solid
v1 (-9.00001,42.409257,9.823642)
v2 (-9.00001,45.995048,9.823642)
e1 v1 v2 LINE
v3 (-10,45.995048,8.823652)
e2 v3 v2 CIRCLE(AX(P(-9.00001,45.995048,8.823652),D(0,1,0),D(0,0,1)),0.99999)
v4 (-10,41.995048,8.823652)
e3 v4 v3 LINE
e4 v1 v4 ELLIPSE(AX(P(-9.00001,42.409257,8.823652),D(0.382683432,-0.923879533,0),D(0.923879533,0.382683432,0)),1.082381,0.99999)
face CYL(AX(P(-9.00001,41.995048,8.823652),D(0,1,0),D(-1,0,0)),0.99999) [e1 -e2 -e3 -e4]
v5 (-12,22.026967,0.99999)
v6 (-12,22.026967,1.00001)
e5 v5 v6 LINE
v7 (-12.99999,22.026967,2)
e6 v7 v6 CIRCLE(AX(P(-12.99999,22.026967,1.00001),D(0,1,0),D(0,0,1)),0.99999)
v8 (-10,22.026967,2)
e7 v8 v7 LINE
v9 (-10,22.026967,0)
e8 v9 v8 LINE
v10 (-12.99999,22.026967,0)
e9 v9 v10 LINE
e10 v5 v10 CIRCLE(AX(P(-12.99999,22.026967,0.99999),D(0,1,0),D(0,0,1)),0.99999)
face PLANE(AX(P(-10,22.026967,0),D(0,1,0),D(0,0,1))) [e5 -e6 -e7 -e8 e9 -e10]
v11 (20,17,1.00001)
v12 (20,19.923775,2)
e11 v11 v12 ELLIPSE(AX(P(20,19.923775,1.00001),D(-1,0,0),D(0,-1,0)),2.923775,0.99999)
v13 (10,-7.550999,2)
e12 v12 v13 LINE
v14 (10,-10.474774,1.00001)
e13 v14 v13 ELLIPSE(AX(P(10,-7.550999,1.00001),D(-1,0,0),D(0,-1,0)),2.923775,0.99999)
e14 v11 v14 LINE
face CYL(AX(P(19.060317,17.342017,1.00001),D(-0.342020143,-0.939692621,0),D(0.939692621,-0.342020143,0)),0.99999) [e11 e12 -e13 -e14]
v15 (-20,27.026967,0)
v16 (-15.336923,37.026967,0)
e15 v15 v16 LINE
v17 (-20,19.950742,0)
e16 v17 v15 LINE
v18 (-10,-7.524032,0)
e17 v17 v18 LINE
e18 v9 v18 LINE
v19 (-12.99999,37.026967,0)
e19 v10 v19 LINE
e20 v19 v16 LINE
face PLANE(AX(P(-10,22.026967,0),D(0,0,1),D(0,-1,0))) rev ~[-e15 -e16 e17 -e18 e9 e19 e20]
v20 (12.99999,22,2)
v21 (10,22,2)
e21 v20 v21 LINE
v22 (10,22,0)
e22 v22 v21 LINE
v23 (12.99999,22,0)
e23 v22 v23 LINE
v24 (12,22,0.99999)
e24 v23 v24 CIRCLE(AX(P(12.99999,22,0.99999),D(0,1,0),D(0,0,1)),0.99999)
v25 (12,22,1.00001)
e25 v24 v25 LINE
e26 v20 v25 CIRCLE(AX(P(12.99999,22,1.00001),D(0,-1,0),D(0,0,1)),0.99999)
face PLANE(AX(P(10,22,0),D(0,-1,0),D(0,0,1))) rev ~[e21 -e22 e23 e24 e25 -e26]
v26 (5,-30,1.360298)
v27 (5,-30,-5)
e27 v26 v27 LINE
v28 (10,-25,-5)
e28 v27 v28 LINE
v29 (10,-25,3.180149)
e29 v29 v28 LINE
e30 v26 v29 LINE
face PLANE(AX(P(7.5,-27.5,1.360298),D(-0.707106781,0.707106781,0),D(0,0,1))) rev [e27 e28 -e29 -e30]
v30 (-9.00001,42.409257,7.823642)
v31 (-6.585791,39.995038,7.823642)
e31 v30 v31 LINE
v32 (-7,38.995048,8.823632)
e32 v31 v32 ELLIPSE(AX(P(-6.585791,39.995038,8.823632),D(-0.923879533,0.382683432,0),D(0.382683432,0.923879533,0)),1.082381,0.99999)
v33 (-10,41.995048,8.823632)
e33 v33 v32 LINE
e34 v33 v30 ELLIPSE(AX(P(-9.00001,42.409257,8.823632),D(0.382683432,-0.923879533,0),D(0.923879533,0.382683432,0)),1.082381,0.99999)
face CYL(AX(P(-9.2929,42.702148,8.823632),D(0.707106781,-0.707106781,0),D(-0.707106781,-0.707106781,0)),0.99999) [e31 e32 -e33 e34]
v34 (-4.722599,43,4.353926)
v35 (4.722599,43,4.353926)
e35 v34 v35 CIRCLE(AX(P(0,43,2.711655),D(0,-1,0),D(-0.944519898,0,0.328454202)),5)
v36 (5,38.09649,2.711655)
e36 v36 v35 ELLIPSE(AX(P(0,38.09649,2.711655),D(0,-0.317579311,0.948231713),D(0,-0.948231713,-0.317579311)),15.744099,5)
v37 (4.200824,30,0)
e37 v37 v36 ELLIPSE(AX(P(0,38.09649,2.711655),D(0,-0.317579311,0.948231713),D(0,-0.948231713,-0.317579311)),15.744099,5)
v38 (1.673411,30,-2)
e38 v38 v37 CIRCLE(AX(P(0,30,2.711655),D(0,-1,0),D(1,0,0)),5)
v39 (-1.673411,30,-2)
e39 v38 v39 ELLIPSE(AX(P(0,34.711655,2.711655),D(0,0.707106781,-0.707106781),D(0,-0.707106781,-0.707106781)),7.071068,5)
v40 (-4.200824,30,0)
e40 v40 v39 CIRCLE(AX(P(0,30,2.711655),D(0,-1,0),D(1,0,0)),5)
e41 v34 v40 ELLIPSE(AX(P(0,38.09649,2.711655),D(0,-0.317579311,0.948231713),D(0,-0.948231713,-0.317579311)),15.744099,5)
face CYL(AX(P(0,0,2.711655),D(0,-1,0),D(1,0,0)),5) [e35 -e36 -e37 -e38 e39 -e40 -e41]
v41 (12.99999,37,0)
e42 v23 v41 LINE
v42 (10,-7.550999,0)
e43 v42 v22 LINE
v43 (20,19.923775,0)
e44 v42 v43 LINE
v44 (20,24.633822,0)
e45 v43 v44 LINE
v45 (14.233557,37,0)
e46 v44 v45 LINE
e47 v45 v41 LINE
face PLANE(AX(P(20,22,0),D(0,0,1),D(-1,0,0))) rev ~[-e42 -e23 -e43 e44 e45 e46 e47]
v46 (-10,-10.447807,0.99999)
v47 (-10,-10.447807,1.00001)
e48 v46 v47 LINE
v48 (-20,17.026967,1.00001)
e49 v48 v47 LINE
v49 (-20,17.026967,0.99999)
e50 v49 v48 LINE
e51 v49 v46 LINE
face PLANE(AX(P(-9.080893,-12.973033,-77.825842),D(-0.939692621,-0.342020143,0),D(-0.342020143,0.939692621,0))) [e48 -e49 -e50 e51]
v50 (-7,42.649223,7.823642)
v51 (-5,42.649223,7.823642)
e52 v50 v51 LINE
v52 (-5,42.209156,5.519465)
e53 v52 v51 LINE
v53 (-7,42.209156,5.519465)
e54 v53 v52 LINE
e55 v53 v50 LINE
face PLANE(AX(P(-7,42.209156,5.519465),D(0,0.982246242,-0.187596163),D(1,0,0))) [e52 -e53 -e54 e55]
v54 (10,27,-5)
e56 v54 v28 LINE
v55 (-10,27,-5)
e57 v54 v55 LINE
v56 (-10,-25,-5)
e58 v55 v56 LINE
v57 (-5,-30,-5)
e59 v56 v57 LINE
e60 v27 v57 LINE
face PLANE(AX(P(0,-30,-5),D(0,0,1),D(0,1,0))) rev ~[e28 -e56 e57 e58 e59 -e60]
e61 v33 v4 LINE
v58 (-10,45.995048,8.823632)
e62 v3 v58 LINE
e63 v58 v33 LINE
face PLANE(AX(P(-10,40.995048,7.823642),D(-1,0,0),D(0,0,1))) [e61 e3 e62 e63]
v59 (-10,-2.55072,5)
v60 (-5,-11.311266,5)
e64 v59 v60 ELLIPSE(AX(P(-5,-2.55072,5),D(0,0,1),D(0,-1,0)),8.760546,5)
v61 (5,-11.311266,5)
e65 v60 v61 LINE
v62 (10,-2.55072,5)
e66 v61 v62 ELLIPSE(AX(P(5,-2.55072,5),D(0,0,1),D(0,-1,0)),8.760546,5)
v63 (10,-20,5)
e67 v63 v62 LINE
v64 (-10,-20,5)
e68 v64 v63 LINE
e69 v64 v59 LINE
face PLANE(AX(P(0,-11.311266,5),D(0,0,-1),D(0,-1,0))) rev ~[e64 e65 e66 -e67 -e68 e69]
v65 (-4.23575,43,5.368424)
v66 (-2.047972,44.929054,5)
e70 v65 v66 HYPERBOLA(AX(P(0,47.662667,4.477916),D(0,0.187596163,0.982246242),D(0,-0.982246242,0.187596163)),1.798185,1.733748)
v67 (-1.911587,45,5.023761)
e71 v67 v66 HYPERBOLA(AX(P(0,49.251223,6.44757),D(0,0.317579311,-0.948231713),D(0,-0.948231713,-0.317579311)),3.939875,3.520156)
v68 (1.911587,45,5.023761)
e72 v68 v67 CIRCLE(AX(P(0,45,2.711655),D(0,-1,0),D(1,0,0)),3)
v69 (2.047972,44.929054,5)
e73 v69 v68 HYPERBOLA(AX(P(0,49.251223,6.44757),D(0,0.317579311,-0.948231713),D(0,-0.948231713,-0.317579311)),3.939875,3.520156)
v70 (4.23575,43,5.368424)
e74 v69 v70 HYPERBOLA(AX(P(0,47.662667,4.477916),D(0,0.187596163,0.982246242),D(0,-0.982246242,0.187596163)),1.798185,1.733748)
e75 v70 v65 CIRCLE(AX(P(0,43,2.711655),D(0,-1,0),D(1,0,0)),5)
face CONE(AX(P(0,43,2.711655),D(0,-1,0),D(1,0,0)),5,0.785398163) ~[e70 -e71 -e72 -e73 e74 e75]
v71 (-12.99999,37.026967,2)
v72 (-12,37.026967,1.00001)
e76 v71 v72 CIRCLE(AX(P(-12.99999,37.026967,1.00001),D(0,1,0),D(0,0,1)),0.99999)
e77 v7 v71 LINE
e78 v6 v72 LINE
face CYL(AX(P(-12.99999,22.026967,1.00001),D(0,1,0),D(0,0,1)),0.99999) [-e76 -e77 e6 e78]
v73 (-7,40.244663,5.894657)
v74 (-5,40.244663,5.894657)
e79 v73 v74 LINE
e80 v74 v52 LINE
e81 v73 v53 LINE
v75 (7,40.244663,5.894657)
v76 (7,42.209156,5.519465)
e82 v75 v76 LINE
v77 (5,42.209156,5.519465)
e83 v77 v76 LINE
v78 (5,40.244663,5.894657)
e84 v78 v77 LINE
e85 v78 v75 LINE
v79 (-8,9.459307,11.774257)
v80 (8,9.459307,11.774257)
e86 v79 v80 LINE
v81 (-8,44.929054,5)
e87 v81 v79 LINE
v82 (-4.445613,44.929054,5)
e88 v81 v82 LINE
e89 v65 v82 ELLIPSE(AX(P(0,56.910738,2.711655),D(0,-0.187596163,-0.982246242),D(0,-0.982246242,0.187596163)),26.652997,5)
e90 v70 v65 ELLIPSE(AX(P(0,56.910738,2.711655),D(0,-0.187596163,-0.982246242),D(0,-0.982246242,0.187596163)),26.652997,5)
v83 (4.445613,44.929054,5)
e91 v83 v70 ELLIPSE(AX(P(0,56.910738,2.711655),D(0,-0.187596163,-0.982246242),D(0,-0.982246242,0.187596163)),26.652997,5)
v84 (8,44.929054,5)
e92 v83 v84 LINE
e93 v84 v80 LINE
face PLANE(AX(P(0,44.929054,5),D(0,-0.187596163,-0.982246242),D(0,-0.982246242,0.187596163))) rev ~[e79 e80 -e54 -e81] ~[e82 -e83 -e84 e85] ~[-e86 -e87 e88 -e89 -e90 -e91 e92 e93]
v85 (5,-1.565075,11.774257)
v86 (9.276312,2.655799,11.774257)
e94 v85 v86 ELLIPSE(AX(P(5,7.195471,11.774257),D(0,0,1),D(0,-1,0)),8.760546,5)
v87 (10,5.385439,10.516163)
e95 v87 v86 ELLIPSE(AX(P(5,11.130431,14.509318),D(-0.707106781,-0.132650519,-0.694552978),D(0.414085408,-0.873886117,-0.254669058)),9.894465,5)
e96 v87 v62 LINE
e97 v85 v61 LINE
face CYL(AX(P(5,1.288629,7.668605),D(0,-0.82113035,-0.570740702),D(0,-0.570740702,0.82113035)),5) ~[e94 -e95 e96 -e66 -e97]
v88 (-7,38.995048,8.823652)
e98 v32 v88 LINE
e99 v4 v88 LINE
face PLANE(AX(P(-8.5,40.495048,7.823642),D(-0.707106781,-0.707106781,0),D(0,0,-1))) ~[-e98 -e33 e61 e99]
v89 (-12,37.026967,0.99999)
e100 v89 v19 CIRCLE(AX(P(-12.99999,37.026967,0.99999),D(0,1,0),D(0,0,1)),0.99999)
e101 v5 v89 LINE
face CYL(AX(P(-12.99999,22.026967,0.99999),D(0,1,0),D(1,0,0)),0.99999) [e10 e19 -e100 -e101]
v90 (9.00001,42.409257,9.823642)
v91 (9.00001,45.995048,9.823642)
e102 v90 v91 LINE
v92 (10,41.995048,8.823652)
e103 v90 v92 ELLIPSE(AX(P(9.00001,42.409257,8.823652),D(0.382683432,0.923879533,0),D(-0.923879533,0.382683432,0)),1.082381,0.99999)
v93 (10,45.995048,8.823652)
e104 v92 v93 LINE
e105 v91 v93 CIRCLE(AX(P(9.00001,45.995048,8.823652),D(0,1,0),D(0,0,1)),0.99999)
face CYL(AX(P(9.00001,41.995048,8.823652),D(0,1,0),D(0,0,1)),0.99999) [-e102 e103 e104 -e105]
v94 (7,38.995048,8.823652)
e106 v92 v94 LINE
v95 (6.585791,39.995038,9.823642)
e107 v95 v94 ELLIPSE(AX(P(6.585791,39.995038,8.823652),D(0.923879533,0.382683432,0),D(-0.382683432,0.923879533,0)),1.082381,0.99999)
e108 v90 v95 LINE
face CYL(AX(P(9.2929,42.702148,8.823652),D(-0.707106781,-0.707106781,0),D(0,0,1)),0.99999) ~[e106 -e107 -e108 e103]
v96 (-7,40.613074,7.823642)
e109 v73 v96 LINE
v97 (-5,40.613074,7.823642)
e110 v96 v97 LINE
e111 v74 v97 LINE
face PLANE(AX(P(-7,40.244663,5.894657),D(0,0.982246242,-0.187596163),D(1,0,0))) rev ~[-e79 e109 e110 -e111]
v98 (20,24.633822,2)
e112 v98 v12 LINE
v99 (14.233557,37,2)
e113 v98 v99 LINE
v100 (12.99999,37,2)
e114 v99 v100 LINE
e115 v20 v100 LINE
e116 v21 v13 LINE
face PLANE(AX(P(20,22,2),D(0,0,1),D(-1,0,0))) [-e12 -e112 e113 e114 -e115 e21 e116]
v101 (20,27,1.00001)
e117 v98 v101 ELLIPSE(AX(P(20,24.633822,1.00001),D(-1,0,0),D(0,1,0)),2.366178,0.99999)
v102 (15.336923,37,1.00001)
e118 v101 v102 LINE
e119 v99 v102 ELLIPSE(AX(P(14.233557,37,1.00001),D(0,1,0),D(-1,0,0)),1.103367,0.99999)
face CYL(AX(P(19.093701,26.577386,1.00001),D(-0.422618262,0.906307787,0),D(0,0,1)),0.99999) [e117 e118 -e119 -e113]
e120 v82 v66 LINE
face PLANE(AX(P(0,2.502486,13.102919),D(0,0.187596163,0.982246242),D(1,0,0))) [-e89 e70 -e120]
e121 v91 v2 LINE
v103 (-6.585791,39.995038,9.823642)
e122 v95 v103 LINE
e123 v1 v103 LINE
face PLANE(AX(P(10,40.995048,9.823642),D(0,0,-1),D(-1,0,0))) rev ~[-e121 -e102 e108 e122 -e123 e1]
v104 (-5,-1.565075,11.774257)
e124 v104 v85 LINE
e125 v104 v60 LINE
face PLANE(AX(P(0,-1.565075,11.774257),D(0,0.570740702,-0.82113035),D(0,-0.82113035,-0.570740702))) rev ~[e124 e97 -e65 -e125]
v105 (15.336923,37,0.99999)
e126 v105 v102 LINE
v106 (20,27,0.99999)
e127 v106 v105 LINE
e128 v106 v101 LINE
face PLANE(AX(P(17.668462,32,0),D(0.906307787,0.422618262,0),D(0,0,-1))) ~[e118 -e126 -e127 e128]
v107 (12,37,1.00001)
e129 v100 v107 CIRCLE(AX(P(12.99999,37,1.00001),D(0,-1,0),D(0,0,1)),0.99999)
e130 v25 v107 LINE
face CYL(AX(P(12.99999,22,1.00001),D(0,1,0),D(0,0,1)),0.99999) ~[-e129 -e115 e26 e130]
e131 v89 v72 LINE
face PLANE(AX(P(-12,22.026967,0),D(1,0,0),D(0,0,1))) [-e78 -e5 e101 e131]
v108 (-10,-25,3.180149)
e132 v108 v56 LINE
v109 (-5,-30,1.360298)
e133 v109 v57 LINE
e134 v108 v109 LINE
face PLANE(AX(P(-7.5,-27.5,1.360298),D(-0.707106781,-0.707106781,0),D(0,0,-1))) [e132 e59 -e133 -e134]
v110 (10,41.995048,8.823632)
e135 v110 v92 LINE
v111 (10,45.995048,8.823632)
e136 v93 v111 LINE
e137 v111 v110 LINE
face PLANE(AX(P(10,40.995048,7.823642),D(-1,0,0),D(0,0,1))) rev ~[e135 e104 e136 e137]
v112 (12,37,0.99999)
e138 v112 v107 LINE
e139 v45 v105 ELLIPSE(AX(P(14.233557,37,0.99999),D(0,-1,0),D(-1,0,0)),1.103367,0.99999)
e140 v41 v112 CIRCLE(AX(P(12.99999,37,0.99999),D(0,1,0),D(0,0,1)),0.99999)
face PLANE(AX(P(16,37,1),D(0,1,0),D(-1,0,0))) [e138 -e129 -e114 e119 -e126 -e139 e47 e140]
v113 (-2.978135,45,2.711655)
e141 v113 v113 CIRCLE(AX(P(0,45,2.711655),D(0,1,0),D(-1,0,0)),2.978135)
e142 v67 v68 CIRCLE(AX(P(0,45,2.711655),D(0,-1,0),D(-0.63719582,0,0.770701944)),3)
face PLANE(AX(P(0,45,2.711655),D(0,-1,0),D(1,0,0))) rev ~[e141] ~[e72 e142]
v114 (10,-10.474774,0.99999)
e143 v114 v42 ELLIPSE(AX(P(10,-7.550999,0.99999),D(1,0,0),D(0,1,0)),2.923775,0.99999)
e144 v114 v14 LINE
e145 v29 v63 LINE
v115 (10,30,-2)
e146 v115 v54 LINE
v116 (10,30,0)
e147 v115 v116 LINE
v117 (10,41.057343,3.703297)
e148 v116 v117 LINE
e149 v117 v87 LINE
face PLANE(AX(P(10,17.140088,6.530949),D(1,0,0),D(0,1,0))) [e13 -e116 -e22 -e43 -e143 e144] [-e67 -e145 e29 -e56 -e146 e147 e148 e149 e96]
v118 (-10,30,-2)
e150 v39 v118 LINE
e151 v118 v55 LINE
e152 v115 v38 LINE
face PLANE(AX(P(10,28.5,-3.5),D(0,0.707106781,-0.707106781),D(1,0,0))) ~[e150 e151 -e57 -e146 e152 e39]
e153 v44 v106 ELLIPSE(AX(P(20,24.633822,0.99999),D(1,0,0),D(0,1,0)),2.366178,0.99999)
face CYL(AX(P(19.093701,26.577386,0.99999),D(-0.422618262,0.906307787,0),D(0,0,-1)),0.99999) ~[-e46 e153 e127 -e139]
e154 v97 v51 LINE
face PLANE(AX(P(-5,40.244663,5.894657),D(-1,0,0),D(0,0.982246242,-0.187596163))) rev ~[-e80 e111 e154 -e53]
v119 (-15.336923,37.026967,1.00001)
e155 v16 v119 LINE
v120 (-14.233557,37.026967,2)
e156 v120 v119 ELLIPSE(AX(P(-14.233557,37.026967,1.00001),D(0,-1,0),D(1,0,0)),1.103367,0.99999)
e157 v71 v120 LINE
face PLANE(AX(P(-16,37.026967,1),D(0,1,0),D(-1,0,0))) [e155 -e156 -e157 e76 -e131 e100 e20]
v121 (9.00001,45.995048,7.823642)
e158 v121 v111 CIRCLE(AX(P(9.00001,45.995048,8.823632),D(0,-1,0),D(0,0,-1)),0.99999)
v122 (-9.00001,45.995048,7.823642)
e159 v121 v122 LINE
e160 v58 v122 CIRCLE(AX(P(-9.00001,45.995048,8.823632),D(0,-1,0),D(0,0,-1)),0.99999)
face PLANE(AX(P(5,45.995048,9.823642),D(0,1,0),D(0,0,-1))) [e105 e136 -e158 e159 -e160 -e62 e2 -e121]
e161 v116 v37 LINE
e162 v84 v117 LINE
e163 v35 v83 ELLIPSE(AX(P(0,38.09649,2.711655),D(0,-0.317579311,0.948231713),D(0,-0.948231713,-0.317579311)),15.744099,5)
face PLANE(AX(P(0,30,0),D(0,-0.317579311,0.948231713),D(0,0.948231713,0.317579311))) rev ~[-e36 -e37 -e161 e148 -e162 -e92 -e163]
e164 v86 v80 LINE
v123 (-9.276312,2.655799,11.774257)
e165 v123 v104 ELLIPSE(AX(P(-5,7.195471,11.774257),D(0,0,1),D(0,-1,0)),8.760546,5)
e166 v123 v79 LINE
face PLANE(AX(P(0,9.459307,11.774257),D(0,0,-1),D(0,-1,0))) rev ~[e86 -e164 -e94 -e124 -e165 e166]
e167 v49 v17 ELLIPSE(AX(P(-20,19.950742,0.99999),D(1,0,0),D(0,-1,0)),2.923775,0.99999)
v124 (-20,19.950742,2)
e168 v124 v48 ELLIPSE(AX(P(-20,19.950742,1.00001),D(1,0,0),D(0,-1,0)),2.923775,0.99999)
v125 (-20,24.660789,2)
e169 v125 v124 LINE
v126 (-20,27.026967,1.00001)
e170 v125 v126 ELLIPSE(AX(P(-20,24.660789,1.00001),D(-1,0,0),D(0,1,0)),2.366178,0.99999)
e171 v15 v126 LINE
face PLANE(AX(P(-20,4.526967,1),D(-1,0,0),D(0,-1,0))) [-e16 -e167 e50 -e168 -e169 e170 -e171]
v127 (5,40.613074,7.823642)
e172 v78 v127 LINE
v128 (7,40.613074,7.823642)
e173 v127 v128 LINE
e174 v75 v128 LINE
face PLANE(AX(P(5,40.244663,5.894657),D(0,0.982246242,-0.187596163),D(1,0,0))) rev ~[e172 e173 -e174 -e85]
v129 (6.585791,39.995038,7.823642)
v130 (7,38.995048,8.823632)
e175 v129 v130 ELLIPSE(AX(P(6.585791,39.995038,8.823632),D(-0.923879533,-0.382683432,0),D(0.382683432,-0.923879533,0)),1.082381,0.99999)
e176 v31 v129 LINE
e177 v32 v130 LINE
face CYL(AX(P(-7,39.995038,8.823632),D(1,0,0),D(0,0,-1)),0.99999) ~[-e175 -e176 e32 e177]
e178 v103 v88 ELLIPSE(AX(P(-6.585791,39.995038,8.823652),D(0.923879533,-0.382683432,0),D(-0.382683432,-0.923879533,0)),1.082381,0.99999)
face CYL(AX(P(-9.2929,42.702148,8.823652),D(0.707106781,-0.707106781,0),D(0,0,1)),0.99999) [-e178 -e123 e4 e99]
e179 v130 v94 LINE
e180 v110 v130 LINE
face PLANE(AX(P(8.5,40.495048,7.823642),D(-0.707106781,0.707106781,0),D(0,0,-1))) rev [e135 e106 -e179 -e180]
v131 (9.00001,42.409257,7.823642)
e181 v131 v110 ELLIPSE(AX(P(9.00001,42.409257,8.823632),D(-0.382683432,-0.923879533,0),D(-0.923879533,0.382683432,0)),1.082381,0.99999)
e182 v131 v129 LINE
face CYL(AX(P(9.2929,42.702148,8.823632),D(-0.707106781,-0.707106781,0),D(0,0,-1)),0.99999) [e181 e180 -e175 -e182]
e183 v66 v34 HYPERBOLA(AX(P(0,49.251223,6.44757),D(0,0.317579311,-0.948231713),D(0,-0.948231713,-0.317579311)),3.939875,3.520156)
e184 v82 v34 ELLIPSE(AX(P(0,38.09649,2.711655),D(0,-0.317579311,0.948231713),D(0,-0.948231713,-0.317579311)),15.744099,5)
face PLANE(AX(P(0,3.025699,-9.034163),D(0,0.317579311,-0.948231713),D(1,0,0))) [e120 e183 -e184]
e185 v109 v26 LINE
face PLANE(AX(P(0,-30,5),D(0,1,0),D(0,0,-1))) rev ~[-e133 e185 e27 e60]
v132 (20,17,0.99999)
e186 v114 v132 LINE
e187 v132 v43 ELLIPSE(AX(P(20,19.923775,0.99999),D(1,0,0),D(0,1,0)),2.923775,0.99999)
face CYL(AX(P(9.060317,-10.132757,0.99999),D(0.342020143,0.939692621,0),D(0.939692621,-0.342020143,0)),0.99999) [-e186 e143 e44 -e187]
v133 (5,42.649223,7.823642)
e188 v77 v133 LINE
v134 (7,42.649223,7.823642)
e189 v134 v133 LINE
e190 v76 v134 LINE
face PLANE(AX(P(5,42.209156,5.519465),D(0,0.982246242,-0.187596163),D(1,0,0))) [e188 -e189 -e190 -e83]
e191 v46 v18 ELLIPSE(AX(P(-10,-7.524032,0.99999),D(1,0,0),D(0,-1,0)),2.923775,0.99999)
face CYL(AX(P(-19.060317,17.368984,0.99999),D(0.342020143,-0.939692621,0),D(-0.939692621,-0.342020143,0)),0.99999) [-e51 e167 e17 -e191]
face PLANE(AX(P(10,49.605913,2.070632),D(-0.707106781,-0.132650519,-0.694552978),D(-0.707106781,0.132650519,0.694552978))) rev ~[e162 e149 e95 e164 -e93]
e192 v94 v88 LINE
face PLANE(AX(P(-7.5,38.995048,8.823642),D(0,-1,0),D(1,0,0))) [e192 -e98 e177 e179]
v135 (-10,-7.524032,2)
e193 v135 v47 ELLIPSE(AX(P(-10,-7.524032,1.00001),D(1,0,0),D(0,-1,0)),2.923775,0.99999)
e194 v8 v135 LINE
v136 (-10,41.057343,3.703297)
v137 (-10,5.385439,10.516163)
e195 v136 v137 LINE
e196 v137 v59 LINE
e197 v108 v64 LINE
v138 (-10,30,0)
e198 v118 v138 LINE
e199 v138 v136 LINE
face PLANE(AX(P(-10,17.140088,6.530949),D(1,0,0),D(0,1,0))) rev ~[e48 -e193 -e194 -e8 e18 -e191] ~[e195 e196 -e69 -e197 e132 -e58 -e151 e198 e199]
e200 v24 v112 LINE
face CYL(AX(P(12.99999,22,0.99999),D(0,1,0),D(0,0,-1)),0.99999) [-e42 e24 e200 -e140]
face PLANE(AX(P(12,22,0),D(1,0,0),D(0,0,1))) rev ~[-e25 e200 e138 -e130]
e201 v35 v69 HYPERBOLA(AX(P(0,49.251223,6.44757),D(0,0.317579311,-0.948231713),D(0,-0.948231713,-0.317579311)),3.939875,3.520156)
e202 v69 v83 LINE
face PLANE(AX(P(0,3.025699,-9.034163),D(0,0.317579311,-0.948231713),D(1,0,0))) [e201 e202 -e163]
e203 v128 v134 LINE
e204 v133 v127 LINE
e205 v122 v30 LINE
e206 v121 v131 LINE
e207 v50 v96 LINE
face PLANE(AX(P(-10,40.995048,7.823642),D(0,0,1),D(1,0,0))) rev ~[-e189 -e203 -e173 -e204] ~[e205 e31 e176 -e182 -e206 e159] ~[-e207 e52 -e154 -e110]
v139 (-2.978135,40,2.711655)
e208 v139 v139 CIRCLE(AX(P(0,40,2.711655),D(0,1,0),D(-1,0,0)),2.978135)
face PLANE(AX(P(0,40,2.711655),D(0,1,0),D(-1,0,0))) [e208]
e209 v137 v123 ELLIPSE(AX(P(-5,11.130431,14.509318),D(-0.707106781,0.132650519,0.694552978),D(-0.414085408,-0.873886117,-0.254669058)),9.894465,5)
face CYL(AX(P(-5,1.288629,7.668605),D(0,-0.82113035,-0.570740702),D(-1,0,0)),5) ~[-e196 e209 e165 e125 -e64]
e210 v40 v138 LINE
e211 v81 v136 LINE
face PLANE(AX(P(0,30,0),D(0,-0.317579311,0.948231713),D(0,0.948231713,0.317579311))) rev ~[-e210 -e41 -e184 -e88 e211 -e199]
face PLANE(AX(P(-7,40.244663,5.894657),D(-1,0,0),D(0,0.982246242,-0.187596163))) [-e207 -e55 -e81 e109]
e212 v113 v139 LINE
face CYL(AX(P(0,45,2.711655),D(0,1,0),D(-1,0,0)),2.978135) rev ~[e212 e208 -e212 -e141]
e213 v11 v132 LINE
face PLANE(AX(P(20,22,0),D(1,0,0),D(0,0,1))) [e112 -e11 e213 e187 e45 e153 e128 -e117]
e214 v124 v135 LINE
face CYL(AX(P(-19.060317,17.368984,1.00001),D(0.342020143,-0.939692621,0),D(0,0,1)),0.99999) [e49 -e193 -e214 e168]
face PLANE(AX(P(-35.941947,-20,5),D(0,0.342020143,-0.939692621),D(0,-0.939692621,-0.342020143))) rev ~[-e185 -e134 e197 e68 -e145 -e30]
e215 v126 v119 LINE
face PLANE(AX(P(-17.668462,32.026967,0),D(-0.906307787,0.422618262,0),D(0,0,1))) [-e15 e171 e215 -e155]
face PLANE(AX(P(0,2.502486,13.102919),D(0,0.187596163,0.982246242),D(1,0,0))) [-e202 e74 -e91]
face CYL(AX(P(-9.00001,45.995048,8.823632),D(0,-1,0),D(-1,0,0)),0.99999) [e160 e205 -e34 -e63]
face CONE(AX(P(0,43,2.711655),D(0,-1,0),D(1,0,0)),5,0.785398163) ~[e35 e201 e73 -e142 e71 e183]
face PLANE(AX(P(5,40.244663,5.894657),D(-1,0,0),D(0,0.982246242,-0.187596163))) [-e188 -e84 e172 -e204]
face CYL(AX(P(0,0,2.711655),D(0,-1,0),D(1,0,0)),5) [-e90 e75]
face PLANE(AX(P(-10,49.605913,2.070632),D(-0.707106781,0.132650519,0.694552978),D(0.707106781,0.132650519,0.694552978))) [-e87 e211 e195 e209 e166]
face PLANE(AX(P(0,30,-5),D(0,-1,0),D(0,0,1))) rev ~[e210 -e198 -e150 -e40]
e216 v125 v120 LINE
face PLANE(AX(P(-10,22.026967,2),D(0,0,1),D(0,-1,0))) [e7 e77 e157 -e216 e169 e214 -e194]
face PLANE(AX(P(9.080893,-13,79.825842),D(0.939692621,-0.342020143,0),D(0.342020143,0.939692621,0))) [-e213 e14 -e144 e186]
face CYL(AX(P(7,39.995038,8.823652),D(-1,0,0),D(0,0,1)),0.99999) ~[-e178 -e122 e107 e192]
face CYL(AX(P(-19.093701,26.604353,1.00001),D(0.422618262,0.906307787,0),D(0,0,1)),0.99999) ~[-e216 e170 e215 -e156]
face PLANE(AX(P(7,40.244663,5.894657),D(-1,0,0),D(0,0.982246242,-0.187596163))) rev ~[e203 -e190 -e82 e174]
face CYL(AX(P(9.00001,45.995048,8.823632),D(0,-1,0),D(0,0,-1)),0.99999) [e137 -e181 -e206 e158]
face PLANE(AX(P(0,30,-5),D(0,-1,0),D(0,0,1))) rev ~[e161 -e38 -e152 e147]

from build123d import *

# Parameters (mm, degrees)
F1_DEPTH     = 10
F2_DEPTH     = 10
F3_R         = 5
F4_T1_DEPTH  = 71.883894651
F5_T1_DEPTH  = 56.6843134125
F6_SIZE      = 3
F7_SIZE      = 5
F10_DEPTH    = 10
F9_W         = 35
F9_H         = 2
F11_DEPTH    = 10
F12_T4_DEPTH = 157.651683953
F13_T4_DEPTH = 157.651683953
F14_W        = 8
F14_H        = 2
F15_W        = 8
F15_H        = 2
F16_DEPTH    = 15
F17_SIZE2    = 4.6630765815
F17_SIZE     = 10
F18_SIZE2    = 4.6630765815
F18_SIZE     = 10
F19_R        = 0.99999
F20_R        = 5
F21_DEPTH    = 45
F22_R        = 2.9781353661
F23_DEPTH    = 5
F25_W        = 2
F25_H        = 2
F26_DEPTH    = 4
F28_DEPTH    = 15
F29_DEPTH    = 5
F30_W        = 5
F30_H        = 2
F31_DEPTH    = 2
F32_SIZE     = 3
F33_R        = 0.99999


# Not quite as in the source:
# - a fillet or chamfer that OpenCascade refuses, or shapes differently, is made with other operations: its cross-section is extruded or revolved along the edge and cut away or added
# - a fillet or chamfer is up to 0.001 mm smaller than in the source, because OpenCascade refuses the exact size


with BuildPart() as f1:
    # F0 (on Right) → F1 (new body)
    with BuildSketch(Plane.YZ):
        Polygon((30, 5), (30, 0), (44.9290536344, 5), (9.4593074173, 11.7742568254), (-1.5650746645, 11.7742568254), (-11.31126564, 5), align=None)
        Polygon((30, 0), (0, 0), (-30, 0), (-30, -5), (30, -5), align=None)
        Polygon((-30, 0), (0, 0), (30, 0), (30, 5), (-11.31126564, 5), (-30, 5), align=None)
    extrude(amount=-F1_DEPTH)

    # F2 (add): a face of the model
    f2_faces = [f1.faces().sort_by_distance(p)[0] for p in [
        (0, 4.6213303299, 2.1526362718),
    ]]
    extrude(f2_faces, amount=F2_DEPTH)

    # F3
    f3_edges = [f1.edges().sort_by_distance(p)[0] for p in [
        (-10, -6.43817, 8.387128),
        (10, -6.43817, 8.387128),
    ]]
    fillet(f3_edges, radius=F3_R)

    # F4: chamfer of 10 x 3.6397023427 on 1 edges, made by hand

    # F4_s2 → F4_t1 (cut)
    with BuildSketch(Plane.YZ.offset(-35.9419473255)):
        Polygon((-20, 5), (-30, 1.3602976573), (-30, 5), align=None)
    extrude(amount=F4_T1_DEPTH, mode=Mode.SUBTRACT)

    # F5: chamfer of 2 on 2 edges, made by hand

    # F5_s2 → F5_t1 (cut)
    with BuildSketch(Plane(origin=(0, 47.4786197454, -9.0677943367), x_dir=(1, 0, 0), z_dir=(0, -0.9822462418, 0.1875961634))):
        Polygon((-10, 11.3397492965), (-8, 13.3397492965), (-10, 13.3397492965), align=None)
        Polygon((10, 11.3397492965), (8, 13.3397492965), (10, 13.3397492965), align=None)
    extrude(amount=F5_T1_DEPTH, mode=Mode.SUBTRACT)

    # F6
    f6_edges = [f1.edges().sort_by_distance(p)[0] for p in [
        (0, 30, -5),
    ]]
    chamfer(f6_edges, length=F6_SIZE)

    # F7
    f7_edges = [f1.edges().sort_by_distance(p)[0] for p in [
        (-10, -30, -1.819851),
        (10, -30, -1.819851),
    ]]
    chamfer(f7_edges, length=F7_SIZE)

    # F8 (on face) → F10 (join)
    with BuildSketch(Plane.YZ.offset(10)):
        Polygon((-13, 0), (0, 0), (22, 0), (22, 2), (-13, 2), align=None)
    extrude(amount=F10_DEPTH)

    # F9 (on face) → F11 (join)
    with BuildSketch(Plane(origin=(-10, 0, 0), x_dir=(0, -1, 0), z_dir=(-1, 0, 0))):
        with Locations((-4.5269672573, 1)):
            Rectangle(F9_W, F9_H)
    extrude(amount=F11_DEPTH)

    # F12: chamfer of 30 x 10.919107028 on 1 edges, made by hand


with BuildPart() as f12_tool2:
    # F12_s3 → F12_t4 (new body)
    with BuildSketch(Plane.XY.offset(-77.8258419765)):
        Polygon((-9.080892972, -12.9730327427), (-20, 17.0269672573), (-20, -12.9730327427), align=None)
    extrude(amount=F12_T4_DEPTH)

    split(bisect_by=Plane.YZ.offset(-10), keep=Keep.BOTTOM)


with BuildPart() as f1_1:
    add(f1.part)

    # F12_t1: cut F12_tool2
    add(f12_tool2.part, mode=Mode.SUBTRACT)

    # F13: chamfer of 30 x 10.919107028 on 1 edges, made by hand


with BuildPart() as f13_tool2:
    # F13_s3 → F13_t4 (new body)
    with BuildSketch(Plane.XY.offset(79.8258419765)):
        Polygon((9.080892972, -13), (20, 17), (20, -13), align=None)
    extrude(amount=-F13_T4_DEPTH)

    split(bisect_by=Plane.YZ.offset(10), keep=Keep.TOP)


with BuildPart() as f1_2:
    add(f1_1.part)

    # F13_t1: cut F13_tool2
    add(f13_tool2.part, mode=Mode.SUBTRACT)

    # F14 (on face) + F15 (on face) → F16 (join)
    with BuildSketch(Plane(origin=(0, 22, 0), x_dir=(-1, 0, 0), z_dir=(0, 1, 0))):
        with Locations((-16, 1)):
            Rectangle(F14_W, F14_H)
    with BuildSketch(Plane(origin=(0, 22.0269672573, 0), x_dir=(-1, 0, 0), z_dir=(0, 1, 0))):
        with Locations((16, 1)):
            Rectangle(F15_W, F15_H)
    extrude(amount=F16_DEPTH)

    # F17
    f17_edges = [f1_2.edges().sort_by_distance(p)[0] for p in [
        (20, 37, 1),
    ]]
    f17_side = f1_2.faces().sort_by_distance((20, 27, 1))[0]
    chamfer(f17_edges, length=F17_SIZE, length2=F17_SIZE2, reference=f17_side)

    # F18
    f18_edges = [f1_2.edges().sort_by_distance(p)[0] for p in [
        (-20, 37.026967, 1),
    ]]
    f18_side = f1_2.faces().sort_by_distance((-20, 27.026967, 1))[0]
    chamfer(f18_edges, length=F18_SIZE, length2=F18_SIZE2, reference=f18_side)

    # F19 (radius 1 in the source; OpenCascade refuses exactly that, so slightly less here)
    f19_edges = [f1_2.edges().sort_by_distance(p)[0] for p in [
        (15, 3.262613, 2),
        (15, 3.262613, 0),
        (17.668462, 32, 0),
        (17.668462, 32, 2),
        (12, 29.5, 2),
        (12, 29.5, 0),
        (-15, 3.28958, 2),
        (-15, 3.28958, 0),
        (-17.668462, 32.026967, 2),
        (-12, 29.526967, 2),
        (-12, 29.526967, 0),
    ]]
    fillet(f19_edges, radius=F19_R)

    # F20 (on Front) → F21 (join)
    with BuildSketch(Plane.XZ):
        with Locations((0, 2.7116553392)):
            Circle(F20_R)
    extrude(amount=-F21_DEPTH)

    # F22 (on face) → F23 (cut)
    with BuildSketch(Plane(origin=(0, 45, 0), x_dir=(-1, 0, 0), z_dir=(0, 1, 0))):
        with Locations((0, 2.7116553392)):
            Circle(F22_R)
    extrude(amount=-F23_DEPTH, mode=Mode.SUBTRACT)

    # F24: chamfer of 2 on 1 edges, made by hand


with BuildPart() as f24_tool2:
    # F24_s3 → F24_t4 (revolve)
    with BuildSketch(Plane.XY.offset(2.7116553392)):
        Polygon((5, 43), (3, 45), (5, 45), align=None)
    revolve(axis=Axis((0, 45, 2.7116553392), (0, -1, 0)))

    split(bisect_by=Plane(origin=(0, 3.0256985599, -9.0341632165), x_dir=(1, 0, 0), z_dir=(0, 0.3175793108, -0.9482317129)), keep=Keep.TOP)


with BuildPart() as f1_3:
    add(f1_2.part)

    # F24_t1: cut F24_tool2
    add(f24_tool2.part, mode=Mode.SUBTRACT)


with BuildPart() as f24_tool7:
    # F24_s8 → F24_t9 (revolve)
    with BuildSketch(Plane.XY.offset(2.7116553392)):
        Polygon((5, 43), (3, 45), (5, 45), align=None)
    revolve(axis=Axis((0, 45, 2.7116553392), (0, -1, 0)))

    split(bisect_by=Plane(origin=(0, 2.5024857889, 13.1029186126), x_dir=(1, 0, 0), z_dir=(0, 0.1875961634, 0.9822462418)), keep=Keep.TOP)


with BuildPart() as f1_4:
    add(f1_3.part)

    # F24_t6: cut F24_tool7
    add(f24_tool7.part, mode=Mode.SUBTRACT)

    # F25 (on face) → F26 (join)
    with BuildSketch(Plane(origin=(0, 2.5024857889, 13.1029186126), x_dir=(1, 0, 0), z_dir=(0, 0.1875961634, 0.9822462418))):
        with Locations((-6, 39.4243540466)):
            Rectangle(F25_W, F25_H)
        with Locations((6, 39.4243540466)):
            Rectangle(F25_W, F25_H)
    extrude(amount=F26_DEPTH)

    # F27 (on face) → F28 (join)
    with BuildSketch(Plane(origin=(5, 0, 0), x_dir=(0, -1, 0), z_dir=(-1, 0, 0))):
        Polygon((-42.9595402808, 9.4484498521), (-40.9950477973, 9.8236421789), (-45.9950477973, 9.8236421789), (-45.9950477973, 7.8236421789), (-42.6492233025, 7.8236421789), align=None)
        Polygon((-40.9950477973, 7.8236421789), (-40.9950477973, 9.8236421789), (-42.9595402808, 9.4484498521), (-42.6492233025, 7.8236421789), align=None)
    extrude(amount=F28_DEPTH)

    # F27 (on face) → F29 (join)
    with BuildSketch(Plane(origin=(5, 0, 0), x_dir=(0, -1, 0), z_dir=(-1, 0, 0))):
        Polygon((-42.9595402808, 9.4484498521), (-40.9950477973, 9.8236421789), (-45.9950477973, 9.8236421789), (-45.9950477973, 7.8236421789), (-42.6492233025, 7.8236421789), align=None)
        Polygon((-40.9950477973, 7.8236421789), (-40.9950477973, 9.8236421789), (-42.9595402808, 9.4484498521), (-42.6492233025, 7.8236421789), align=None)
    extrude(amount=-F29_DEPTH)

    # F30 (on face) → F31 (join)
    with BuildSketch(Plane.XZ.offset(-40.9950477973)):
        with Locations((-7.5, 8.8236421789)):
            Rectangle(F30_W, F30_H)
        Polygon((-5, 7.8236421789), (0, 7.8236421789), (5, 7.8236421789), (5, 9.8236421789), (0, 9.8236421789), (-5, 9.8236421789), align=None)
        with Locations((7.5, 8.8236421789)):
            Rectangle(F30_W, F30_H)
    extrude(amount=F31_DEPTH)

    # F32
    f32_edges = [f1_4.edges().sort_by_distance(p)[0] for p in [
        (-10, 38.995048, 8.823642),
        (10, 38.995048, 8.823642),
    ]]
    chamfer(f32_edges, length=F32_SIZE)

    # F33 (radius 1 in the source; OpenCascade refuses exactly that, so slightly less here)
    f33_edges = [f1_4.edges().sort_by_distance(p)[0] for p in [
        (0, 38.995048, 7.823642),
        (0, 38.995048, 9.823642),
        (-8.5, 40.495048, 9.823642),
        (-8.5, 40.495048, 7.823642),
        (8.5, 40.495048, 9.823642),
        (8.5, 40.495048, 7.823642),
        (10, 43.995048, 7.823642),
        (10, 43.995048, 9.823642),
        (-10, 43.995048, 9.823642),
        (-10, 43.995048, 7.823642),
    ]]
    fillet(f33_edges, radius=F33_R)


solid = f1_4.part
